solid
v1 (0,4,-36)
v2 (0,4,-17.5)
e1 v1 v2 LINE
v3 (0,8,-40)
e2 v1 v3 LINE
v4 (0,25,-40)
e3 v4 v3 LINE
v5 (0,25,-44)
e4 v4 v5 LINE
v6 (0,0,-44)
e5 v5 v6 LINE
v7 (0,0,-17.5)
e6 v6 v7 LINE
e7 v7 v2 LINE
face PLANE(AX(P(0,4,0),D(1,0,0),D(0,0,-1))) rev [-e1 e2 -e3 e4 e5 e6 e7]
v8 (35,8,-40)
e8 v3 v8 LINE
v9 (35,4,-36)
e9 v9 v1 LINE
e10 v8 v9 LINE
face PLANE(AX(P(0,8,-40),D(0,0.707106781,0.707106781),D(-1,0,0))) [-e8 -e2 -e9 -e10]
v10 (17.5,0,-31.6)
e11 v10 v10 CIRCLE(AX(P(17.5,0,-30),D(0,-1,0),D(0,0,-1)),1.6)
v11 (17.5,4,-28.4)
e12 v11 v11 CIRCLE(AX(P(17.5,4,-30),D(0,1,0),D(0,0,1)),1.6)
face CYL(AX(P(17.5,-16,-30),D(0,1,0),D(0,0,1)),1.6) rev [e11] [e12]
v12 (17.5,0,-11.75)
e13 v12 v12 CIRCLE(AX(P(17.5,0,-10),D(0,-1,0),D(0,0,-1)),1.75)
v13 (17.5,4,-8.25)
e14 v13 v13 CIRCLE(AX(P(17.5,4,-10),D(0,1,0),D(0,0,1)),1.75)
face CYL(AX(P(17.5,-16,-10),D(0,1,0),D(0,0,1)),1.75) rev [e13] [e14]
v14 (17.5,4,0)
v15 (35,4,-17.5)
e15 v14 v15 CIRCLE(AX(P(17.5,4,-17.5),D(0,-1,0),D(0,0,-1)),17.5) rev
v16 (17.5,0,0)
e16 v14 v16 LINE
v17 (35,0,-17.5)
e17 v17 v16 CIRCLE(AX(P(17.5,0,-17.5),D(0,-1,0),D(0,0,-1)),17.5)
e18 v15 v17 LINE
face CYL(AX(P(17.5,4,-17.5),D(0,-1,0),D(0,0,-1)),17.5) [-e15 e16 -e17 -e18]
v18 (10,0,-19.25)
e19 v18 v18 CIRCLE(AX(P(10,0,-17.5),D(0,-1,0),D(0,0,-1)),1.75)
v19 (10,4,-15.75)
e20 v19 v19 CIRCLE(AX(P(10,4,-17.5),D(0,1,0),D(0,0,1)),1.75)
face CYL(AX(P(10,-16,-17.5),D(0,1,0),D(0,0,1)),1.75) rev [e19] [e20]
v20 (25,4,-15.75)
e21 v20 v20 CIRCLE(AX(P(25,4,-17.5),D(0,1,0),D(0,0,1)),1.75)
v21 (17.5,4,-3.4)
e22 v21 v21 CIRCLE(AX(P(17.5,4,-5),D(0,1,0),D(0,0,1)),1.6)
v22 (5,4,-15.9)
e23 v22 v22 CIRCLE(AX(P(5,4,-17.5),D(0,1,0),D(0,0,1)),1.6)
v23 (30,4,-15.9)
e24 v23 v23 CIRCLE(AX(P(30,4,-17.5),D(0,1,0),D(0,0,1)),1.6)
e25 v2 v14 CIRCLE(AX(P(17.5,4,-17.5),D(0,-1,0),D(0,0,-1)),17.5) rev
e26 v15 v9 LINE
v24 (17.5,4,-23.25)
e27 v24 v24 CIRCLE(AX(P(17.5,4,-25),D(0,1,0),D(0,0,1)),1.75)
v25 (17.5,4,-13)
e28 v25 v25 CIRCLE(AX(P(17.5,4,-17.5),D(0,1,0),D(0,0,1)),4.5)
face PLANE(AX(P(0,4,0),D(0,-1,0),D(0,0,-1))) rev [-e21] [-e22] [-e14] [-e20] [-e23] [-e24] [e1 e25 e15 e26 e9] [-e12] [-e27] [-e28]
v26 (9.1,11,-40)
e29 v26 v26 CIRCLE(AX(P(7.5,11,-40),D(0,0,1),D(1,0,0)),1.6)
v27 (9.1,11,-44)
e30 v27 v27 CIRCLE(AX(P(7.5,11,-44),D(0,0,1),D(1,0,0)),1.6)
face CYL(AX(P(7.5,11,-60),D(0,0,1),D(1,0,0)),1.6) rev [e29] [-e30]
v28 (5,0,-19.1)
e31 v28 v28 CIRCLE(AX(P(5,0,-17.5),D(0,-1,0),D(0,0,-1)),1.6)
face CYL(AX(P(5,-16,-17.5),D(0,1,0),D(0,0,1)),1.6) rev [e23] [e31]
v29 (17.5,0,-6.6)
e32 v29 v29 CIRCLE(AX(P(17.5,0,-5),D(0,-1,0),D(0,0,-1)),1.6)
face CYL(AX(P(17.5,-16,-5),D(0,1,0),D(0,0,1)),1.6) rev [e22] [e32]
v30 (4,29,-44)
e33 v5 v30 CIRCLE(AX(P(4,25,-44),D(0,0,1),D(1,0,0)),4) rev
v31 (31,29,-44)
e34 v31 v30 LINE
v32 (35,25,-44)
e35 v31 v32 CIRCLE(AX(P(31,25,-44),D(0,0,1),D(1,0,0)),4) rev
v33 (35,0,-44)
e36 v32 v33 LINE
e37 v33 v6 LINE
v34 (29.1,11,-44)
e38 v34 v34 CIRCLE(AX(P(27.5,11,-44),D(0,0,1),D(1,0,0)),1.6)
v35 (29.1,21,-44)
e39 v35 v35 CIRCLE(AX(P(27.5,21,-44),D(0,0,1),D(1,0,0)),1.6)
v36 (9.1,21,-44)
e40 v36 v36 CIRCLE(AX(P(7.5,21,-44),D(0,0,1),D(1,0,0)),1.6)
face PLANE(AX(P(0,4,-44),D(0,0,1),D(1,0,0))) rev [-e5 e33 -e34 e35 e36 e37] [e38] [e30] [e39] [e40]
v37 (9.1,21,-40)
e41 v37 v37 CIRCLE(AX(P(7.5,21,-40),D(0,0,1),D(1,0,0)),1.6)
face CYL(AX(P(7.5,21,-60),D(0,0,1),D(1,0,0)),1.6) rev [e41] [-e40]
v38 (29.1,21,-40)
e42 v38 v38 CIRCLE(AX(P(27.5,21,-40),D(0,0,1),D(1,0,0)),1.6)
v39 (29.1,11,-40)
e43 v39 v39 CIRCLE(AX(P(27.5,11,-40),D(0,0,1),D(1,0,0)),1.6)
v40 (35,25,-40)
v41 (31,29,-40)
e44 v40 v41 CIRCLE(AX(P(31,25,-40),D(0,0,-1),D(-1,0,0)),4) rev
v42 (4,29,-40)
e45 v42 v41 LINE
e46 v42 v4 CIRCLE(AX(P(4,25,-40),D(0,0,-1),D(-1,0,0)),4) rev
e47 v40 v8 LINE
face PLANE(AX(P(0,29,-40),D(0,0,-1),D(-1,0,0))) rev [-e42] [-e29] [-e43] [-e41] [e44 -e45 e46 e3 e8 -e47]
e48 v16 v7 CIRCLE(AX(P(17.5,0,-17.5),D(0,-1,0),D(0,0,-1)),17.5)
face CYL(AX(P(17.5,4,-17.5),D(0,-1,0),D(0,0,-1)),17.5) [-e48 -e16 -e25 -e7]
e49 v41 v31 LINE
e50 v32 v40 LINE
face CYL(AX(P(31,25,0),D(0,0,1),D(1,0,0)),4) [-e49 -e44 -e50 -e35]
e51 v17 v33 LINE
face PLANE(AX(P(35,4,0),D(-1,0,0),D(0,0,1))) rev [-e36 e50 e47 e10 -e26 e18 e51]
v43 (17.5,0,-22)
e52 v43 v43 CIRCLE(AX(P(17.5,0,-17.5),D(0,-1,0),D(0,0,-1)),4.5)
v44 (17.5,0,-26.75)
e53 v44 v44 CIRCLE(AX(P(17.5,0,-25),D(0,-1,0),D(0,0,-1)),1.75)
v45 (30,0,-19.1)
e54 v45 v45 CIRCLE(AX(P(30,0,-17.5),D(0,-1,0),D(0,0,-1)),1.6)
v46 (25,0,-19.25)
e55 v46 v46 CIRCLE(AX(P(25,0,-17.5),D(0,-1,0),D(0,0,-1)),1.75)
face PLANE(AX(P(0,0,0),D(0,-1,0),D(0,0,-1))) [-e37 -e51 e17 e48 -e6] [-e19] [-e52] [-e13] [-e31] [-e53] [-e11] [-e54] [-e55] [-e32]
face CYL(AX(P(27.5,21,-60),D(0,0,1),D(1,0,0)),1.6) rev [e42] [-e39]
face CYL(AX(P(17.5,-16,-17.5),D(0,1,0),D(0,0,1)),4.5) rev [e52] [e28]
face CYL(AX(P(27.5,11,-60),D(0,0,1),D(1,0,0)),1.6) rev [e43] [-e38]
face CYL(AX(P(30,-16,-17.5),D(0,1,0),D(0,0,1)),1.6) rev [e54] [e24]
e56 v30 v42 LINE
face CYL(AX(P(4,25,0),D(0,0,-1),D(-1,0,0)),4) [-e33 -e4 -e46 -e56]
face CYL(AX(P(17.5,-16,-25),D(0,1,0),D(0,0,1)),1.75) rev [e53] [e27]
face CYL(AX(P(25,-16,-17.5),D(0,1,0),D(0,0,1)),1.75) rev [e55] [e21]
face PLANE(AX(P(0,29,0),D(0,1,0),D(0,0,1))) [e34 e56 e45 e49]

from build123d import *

# Parameters (mm, degrees)
SKETCH_1_W          = 35
SKETCH_1_H          = 44
EXTRUDE_1_DEPTH     = 4
SKETCH_2_W          = 35
SKETCH_2_H          = 4
EXTRUDE_2_DEPTH     = 25
SKETCH_3_R          = 4.5
SKETCH_3_R_2        = 1.75
SKETCH_3_R_3        = 1.6
CUT_EXTRUDE_1_DEPTH = 20
CHAMFER_1_SIZE      = 4
SKETCH_5_R          = 1.6
CUT_EXTRUDE_2_DEPTH = 20
FILLET_1_R          = 17.5
FILLET_2_R          = 4


with BuildPart() as part:
    # 草图1 → 凸台-拉伸1 (new body)
    with BuildSketch(Plane(origin=(0, 0, 0), x_dir=(1, 0, 0), z_dir=(0, 1, 0))):
        with Locations((17.5, 22)):
            Rectangle(SKETCH_1_W, SKETCH_1_H)
    extrude(amount=EXTRUDE_1_DEPTH)

    # 草图2 → 凸台-拉伸2 (add)
    with BuildSketch(Plane(origin=(0, 4, 0), x_dir=(1, 0, 0), z_dir=(0, 1, 0))):
        with Locations((17.5, 42)):
            Rectangle(SKETCH_2_W, SKETCH_2_H)
    extrude(amount=EXTRUDE_2_DEPTH)

    # 草图3 → 切除-拉伸1 (cut)
    with BuildSketch(Plane(origin=(0, 4, 0), x_dir=(1, 0, 0), z_dir=(0, 1, 0))):
        with Locations(Location((17.5, 17.5, 0), (0, 0, 270))):
            Circle(SKETCH_3_R)
        with Locations(Location((17.5, 25, 0), (0, 0, 270))):
            Circle(SKETCH_3_R_2)
        with Locations(Location((25, 17.5, 0), (0, 0, 270))):
            Circle(SKETCH_3_R_2)
        with Locations(Location((10, 17.5, 0), (0, 0, 270))):
            Circle(SKETCH_3_R_2)
        with Locations(Location((17.5, 10, 0), (0, 0, 270))):
            Circle(SKETCH_3_R_2)
        with Locations(Location((17.5, 30, 0), (0, 0, 270))):
            Circle(SKETCH_3_R_3)
        with Locations(Location((30, 17.5, 0), (0, 0, 270))):
            Circle(SKETCH_3_R_3)
        with Locations(Location((17.5, 5, 0), (0, 0, 270))):
            Circle(SKETCH_3_R_3)
        with Locations(Location((5, 17.5, 0), (0, 0, 270))):
            Circle(SKETCH_3_R_3)
    extrude(amount=-CUT_EXTRUDE_1_DEPTH, mode=Mode.SUBTRACT)

    # 倒角1
    chamfer_1_edges = [part.edges().sort_by_distance(p)[0] for p in [
        (17.5, 4, -40),
    ]]
    chamfer(chamfer_1_edges, length=CHAMFER_1_SIZE)

    # 草图5 → 切除-拉伸2 (cut)
    with BuildSketch(Plane.XY.offset(-40)):
        with Locations((7.5, 21)):
            Circle(SKETCH_5_R)
        with Locations((27.5, 21)):
            Circle(SKETCH_5_R)
        with Locations((27.5, 11)):
            Circle(SKETCH_5_R)
        with Locations((7.5, 11)):
            Circle(SKETCH_5_R)
    extrude(amount=-CUT_EXTRUDE_2_DEPTH, mode=Mode.SUBTRACT)

    # 圆角1
    fillet_1_edges = [part.edges().sort_by_distance(p)[0] for p in [
        (35, 2, 0),
        (0, 2, 0),
    ]]
    fillet(fillet_1_edges, radius=FILLET_1_R - 0.0001)  # a hair under: the kernel refuses the full size

    # 圆角2
    fillet_2_edges = [part.edges().sort_by_distance(p)[0] for p in [
        (0, 29, -42),
        (35, 29, -42),
    ]]
    fillet(fillet_2_edges, radius=FILLET_2_R)


solid = part.part
